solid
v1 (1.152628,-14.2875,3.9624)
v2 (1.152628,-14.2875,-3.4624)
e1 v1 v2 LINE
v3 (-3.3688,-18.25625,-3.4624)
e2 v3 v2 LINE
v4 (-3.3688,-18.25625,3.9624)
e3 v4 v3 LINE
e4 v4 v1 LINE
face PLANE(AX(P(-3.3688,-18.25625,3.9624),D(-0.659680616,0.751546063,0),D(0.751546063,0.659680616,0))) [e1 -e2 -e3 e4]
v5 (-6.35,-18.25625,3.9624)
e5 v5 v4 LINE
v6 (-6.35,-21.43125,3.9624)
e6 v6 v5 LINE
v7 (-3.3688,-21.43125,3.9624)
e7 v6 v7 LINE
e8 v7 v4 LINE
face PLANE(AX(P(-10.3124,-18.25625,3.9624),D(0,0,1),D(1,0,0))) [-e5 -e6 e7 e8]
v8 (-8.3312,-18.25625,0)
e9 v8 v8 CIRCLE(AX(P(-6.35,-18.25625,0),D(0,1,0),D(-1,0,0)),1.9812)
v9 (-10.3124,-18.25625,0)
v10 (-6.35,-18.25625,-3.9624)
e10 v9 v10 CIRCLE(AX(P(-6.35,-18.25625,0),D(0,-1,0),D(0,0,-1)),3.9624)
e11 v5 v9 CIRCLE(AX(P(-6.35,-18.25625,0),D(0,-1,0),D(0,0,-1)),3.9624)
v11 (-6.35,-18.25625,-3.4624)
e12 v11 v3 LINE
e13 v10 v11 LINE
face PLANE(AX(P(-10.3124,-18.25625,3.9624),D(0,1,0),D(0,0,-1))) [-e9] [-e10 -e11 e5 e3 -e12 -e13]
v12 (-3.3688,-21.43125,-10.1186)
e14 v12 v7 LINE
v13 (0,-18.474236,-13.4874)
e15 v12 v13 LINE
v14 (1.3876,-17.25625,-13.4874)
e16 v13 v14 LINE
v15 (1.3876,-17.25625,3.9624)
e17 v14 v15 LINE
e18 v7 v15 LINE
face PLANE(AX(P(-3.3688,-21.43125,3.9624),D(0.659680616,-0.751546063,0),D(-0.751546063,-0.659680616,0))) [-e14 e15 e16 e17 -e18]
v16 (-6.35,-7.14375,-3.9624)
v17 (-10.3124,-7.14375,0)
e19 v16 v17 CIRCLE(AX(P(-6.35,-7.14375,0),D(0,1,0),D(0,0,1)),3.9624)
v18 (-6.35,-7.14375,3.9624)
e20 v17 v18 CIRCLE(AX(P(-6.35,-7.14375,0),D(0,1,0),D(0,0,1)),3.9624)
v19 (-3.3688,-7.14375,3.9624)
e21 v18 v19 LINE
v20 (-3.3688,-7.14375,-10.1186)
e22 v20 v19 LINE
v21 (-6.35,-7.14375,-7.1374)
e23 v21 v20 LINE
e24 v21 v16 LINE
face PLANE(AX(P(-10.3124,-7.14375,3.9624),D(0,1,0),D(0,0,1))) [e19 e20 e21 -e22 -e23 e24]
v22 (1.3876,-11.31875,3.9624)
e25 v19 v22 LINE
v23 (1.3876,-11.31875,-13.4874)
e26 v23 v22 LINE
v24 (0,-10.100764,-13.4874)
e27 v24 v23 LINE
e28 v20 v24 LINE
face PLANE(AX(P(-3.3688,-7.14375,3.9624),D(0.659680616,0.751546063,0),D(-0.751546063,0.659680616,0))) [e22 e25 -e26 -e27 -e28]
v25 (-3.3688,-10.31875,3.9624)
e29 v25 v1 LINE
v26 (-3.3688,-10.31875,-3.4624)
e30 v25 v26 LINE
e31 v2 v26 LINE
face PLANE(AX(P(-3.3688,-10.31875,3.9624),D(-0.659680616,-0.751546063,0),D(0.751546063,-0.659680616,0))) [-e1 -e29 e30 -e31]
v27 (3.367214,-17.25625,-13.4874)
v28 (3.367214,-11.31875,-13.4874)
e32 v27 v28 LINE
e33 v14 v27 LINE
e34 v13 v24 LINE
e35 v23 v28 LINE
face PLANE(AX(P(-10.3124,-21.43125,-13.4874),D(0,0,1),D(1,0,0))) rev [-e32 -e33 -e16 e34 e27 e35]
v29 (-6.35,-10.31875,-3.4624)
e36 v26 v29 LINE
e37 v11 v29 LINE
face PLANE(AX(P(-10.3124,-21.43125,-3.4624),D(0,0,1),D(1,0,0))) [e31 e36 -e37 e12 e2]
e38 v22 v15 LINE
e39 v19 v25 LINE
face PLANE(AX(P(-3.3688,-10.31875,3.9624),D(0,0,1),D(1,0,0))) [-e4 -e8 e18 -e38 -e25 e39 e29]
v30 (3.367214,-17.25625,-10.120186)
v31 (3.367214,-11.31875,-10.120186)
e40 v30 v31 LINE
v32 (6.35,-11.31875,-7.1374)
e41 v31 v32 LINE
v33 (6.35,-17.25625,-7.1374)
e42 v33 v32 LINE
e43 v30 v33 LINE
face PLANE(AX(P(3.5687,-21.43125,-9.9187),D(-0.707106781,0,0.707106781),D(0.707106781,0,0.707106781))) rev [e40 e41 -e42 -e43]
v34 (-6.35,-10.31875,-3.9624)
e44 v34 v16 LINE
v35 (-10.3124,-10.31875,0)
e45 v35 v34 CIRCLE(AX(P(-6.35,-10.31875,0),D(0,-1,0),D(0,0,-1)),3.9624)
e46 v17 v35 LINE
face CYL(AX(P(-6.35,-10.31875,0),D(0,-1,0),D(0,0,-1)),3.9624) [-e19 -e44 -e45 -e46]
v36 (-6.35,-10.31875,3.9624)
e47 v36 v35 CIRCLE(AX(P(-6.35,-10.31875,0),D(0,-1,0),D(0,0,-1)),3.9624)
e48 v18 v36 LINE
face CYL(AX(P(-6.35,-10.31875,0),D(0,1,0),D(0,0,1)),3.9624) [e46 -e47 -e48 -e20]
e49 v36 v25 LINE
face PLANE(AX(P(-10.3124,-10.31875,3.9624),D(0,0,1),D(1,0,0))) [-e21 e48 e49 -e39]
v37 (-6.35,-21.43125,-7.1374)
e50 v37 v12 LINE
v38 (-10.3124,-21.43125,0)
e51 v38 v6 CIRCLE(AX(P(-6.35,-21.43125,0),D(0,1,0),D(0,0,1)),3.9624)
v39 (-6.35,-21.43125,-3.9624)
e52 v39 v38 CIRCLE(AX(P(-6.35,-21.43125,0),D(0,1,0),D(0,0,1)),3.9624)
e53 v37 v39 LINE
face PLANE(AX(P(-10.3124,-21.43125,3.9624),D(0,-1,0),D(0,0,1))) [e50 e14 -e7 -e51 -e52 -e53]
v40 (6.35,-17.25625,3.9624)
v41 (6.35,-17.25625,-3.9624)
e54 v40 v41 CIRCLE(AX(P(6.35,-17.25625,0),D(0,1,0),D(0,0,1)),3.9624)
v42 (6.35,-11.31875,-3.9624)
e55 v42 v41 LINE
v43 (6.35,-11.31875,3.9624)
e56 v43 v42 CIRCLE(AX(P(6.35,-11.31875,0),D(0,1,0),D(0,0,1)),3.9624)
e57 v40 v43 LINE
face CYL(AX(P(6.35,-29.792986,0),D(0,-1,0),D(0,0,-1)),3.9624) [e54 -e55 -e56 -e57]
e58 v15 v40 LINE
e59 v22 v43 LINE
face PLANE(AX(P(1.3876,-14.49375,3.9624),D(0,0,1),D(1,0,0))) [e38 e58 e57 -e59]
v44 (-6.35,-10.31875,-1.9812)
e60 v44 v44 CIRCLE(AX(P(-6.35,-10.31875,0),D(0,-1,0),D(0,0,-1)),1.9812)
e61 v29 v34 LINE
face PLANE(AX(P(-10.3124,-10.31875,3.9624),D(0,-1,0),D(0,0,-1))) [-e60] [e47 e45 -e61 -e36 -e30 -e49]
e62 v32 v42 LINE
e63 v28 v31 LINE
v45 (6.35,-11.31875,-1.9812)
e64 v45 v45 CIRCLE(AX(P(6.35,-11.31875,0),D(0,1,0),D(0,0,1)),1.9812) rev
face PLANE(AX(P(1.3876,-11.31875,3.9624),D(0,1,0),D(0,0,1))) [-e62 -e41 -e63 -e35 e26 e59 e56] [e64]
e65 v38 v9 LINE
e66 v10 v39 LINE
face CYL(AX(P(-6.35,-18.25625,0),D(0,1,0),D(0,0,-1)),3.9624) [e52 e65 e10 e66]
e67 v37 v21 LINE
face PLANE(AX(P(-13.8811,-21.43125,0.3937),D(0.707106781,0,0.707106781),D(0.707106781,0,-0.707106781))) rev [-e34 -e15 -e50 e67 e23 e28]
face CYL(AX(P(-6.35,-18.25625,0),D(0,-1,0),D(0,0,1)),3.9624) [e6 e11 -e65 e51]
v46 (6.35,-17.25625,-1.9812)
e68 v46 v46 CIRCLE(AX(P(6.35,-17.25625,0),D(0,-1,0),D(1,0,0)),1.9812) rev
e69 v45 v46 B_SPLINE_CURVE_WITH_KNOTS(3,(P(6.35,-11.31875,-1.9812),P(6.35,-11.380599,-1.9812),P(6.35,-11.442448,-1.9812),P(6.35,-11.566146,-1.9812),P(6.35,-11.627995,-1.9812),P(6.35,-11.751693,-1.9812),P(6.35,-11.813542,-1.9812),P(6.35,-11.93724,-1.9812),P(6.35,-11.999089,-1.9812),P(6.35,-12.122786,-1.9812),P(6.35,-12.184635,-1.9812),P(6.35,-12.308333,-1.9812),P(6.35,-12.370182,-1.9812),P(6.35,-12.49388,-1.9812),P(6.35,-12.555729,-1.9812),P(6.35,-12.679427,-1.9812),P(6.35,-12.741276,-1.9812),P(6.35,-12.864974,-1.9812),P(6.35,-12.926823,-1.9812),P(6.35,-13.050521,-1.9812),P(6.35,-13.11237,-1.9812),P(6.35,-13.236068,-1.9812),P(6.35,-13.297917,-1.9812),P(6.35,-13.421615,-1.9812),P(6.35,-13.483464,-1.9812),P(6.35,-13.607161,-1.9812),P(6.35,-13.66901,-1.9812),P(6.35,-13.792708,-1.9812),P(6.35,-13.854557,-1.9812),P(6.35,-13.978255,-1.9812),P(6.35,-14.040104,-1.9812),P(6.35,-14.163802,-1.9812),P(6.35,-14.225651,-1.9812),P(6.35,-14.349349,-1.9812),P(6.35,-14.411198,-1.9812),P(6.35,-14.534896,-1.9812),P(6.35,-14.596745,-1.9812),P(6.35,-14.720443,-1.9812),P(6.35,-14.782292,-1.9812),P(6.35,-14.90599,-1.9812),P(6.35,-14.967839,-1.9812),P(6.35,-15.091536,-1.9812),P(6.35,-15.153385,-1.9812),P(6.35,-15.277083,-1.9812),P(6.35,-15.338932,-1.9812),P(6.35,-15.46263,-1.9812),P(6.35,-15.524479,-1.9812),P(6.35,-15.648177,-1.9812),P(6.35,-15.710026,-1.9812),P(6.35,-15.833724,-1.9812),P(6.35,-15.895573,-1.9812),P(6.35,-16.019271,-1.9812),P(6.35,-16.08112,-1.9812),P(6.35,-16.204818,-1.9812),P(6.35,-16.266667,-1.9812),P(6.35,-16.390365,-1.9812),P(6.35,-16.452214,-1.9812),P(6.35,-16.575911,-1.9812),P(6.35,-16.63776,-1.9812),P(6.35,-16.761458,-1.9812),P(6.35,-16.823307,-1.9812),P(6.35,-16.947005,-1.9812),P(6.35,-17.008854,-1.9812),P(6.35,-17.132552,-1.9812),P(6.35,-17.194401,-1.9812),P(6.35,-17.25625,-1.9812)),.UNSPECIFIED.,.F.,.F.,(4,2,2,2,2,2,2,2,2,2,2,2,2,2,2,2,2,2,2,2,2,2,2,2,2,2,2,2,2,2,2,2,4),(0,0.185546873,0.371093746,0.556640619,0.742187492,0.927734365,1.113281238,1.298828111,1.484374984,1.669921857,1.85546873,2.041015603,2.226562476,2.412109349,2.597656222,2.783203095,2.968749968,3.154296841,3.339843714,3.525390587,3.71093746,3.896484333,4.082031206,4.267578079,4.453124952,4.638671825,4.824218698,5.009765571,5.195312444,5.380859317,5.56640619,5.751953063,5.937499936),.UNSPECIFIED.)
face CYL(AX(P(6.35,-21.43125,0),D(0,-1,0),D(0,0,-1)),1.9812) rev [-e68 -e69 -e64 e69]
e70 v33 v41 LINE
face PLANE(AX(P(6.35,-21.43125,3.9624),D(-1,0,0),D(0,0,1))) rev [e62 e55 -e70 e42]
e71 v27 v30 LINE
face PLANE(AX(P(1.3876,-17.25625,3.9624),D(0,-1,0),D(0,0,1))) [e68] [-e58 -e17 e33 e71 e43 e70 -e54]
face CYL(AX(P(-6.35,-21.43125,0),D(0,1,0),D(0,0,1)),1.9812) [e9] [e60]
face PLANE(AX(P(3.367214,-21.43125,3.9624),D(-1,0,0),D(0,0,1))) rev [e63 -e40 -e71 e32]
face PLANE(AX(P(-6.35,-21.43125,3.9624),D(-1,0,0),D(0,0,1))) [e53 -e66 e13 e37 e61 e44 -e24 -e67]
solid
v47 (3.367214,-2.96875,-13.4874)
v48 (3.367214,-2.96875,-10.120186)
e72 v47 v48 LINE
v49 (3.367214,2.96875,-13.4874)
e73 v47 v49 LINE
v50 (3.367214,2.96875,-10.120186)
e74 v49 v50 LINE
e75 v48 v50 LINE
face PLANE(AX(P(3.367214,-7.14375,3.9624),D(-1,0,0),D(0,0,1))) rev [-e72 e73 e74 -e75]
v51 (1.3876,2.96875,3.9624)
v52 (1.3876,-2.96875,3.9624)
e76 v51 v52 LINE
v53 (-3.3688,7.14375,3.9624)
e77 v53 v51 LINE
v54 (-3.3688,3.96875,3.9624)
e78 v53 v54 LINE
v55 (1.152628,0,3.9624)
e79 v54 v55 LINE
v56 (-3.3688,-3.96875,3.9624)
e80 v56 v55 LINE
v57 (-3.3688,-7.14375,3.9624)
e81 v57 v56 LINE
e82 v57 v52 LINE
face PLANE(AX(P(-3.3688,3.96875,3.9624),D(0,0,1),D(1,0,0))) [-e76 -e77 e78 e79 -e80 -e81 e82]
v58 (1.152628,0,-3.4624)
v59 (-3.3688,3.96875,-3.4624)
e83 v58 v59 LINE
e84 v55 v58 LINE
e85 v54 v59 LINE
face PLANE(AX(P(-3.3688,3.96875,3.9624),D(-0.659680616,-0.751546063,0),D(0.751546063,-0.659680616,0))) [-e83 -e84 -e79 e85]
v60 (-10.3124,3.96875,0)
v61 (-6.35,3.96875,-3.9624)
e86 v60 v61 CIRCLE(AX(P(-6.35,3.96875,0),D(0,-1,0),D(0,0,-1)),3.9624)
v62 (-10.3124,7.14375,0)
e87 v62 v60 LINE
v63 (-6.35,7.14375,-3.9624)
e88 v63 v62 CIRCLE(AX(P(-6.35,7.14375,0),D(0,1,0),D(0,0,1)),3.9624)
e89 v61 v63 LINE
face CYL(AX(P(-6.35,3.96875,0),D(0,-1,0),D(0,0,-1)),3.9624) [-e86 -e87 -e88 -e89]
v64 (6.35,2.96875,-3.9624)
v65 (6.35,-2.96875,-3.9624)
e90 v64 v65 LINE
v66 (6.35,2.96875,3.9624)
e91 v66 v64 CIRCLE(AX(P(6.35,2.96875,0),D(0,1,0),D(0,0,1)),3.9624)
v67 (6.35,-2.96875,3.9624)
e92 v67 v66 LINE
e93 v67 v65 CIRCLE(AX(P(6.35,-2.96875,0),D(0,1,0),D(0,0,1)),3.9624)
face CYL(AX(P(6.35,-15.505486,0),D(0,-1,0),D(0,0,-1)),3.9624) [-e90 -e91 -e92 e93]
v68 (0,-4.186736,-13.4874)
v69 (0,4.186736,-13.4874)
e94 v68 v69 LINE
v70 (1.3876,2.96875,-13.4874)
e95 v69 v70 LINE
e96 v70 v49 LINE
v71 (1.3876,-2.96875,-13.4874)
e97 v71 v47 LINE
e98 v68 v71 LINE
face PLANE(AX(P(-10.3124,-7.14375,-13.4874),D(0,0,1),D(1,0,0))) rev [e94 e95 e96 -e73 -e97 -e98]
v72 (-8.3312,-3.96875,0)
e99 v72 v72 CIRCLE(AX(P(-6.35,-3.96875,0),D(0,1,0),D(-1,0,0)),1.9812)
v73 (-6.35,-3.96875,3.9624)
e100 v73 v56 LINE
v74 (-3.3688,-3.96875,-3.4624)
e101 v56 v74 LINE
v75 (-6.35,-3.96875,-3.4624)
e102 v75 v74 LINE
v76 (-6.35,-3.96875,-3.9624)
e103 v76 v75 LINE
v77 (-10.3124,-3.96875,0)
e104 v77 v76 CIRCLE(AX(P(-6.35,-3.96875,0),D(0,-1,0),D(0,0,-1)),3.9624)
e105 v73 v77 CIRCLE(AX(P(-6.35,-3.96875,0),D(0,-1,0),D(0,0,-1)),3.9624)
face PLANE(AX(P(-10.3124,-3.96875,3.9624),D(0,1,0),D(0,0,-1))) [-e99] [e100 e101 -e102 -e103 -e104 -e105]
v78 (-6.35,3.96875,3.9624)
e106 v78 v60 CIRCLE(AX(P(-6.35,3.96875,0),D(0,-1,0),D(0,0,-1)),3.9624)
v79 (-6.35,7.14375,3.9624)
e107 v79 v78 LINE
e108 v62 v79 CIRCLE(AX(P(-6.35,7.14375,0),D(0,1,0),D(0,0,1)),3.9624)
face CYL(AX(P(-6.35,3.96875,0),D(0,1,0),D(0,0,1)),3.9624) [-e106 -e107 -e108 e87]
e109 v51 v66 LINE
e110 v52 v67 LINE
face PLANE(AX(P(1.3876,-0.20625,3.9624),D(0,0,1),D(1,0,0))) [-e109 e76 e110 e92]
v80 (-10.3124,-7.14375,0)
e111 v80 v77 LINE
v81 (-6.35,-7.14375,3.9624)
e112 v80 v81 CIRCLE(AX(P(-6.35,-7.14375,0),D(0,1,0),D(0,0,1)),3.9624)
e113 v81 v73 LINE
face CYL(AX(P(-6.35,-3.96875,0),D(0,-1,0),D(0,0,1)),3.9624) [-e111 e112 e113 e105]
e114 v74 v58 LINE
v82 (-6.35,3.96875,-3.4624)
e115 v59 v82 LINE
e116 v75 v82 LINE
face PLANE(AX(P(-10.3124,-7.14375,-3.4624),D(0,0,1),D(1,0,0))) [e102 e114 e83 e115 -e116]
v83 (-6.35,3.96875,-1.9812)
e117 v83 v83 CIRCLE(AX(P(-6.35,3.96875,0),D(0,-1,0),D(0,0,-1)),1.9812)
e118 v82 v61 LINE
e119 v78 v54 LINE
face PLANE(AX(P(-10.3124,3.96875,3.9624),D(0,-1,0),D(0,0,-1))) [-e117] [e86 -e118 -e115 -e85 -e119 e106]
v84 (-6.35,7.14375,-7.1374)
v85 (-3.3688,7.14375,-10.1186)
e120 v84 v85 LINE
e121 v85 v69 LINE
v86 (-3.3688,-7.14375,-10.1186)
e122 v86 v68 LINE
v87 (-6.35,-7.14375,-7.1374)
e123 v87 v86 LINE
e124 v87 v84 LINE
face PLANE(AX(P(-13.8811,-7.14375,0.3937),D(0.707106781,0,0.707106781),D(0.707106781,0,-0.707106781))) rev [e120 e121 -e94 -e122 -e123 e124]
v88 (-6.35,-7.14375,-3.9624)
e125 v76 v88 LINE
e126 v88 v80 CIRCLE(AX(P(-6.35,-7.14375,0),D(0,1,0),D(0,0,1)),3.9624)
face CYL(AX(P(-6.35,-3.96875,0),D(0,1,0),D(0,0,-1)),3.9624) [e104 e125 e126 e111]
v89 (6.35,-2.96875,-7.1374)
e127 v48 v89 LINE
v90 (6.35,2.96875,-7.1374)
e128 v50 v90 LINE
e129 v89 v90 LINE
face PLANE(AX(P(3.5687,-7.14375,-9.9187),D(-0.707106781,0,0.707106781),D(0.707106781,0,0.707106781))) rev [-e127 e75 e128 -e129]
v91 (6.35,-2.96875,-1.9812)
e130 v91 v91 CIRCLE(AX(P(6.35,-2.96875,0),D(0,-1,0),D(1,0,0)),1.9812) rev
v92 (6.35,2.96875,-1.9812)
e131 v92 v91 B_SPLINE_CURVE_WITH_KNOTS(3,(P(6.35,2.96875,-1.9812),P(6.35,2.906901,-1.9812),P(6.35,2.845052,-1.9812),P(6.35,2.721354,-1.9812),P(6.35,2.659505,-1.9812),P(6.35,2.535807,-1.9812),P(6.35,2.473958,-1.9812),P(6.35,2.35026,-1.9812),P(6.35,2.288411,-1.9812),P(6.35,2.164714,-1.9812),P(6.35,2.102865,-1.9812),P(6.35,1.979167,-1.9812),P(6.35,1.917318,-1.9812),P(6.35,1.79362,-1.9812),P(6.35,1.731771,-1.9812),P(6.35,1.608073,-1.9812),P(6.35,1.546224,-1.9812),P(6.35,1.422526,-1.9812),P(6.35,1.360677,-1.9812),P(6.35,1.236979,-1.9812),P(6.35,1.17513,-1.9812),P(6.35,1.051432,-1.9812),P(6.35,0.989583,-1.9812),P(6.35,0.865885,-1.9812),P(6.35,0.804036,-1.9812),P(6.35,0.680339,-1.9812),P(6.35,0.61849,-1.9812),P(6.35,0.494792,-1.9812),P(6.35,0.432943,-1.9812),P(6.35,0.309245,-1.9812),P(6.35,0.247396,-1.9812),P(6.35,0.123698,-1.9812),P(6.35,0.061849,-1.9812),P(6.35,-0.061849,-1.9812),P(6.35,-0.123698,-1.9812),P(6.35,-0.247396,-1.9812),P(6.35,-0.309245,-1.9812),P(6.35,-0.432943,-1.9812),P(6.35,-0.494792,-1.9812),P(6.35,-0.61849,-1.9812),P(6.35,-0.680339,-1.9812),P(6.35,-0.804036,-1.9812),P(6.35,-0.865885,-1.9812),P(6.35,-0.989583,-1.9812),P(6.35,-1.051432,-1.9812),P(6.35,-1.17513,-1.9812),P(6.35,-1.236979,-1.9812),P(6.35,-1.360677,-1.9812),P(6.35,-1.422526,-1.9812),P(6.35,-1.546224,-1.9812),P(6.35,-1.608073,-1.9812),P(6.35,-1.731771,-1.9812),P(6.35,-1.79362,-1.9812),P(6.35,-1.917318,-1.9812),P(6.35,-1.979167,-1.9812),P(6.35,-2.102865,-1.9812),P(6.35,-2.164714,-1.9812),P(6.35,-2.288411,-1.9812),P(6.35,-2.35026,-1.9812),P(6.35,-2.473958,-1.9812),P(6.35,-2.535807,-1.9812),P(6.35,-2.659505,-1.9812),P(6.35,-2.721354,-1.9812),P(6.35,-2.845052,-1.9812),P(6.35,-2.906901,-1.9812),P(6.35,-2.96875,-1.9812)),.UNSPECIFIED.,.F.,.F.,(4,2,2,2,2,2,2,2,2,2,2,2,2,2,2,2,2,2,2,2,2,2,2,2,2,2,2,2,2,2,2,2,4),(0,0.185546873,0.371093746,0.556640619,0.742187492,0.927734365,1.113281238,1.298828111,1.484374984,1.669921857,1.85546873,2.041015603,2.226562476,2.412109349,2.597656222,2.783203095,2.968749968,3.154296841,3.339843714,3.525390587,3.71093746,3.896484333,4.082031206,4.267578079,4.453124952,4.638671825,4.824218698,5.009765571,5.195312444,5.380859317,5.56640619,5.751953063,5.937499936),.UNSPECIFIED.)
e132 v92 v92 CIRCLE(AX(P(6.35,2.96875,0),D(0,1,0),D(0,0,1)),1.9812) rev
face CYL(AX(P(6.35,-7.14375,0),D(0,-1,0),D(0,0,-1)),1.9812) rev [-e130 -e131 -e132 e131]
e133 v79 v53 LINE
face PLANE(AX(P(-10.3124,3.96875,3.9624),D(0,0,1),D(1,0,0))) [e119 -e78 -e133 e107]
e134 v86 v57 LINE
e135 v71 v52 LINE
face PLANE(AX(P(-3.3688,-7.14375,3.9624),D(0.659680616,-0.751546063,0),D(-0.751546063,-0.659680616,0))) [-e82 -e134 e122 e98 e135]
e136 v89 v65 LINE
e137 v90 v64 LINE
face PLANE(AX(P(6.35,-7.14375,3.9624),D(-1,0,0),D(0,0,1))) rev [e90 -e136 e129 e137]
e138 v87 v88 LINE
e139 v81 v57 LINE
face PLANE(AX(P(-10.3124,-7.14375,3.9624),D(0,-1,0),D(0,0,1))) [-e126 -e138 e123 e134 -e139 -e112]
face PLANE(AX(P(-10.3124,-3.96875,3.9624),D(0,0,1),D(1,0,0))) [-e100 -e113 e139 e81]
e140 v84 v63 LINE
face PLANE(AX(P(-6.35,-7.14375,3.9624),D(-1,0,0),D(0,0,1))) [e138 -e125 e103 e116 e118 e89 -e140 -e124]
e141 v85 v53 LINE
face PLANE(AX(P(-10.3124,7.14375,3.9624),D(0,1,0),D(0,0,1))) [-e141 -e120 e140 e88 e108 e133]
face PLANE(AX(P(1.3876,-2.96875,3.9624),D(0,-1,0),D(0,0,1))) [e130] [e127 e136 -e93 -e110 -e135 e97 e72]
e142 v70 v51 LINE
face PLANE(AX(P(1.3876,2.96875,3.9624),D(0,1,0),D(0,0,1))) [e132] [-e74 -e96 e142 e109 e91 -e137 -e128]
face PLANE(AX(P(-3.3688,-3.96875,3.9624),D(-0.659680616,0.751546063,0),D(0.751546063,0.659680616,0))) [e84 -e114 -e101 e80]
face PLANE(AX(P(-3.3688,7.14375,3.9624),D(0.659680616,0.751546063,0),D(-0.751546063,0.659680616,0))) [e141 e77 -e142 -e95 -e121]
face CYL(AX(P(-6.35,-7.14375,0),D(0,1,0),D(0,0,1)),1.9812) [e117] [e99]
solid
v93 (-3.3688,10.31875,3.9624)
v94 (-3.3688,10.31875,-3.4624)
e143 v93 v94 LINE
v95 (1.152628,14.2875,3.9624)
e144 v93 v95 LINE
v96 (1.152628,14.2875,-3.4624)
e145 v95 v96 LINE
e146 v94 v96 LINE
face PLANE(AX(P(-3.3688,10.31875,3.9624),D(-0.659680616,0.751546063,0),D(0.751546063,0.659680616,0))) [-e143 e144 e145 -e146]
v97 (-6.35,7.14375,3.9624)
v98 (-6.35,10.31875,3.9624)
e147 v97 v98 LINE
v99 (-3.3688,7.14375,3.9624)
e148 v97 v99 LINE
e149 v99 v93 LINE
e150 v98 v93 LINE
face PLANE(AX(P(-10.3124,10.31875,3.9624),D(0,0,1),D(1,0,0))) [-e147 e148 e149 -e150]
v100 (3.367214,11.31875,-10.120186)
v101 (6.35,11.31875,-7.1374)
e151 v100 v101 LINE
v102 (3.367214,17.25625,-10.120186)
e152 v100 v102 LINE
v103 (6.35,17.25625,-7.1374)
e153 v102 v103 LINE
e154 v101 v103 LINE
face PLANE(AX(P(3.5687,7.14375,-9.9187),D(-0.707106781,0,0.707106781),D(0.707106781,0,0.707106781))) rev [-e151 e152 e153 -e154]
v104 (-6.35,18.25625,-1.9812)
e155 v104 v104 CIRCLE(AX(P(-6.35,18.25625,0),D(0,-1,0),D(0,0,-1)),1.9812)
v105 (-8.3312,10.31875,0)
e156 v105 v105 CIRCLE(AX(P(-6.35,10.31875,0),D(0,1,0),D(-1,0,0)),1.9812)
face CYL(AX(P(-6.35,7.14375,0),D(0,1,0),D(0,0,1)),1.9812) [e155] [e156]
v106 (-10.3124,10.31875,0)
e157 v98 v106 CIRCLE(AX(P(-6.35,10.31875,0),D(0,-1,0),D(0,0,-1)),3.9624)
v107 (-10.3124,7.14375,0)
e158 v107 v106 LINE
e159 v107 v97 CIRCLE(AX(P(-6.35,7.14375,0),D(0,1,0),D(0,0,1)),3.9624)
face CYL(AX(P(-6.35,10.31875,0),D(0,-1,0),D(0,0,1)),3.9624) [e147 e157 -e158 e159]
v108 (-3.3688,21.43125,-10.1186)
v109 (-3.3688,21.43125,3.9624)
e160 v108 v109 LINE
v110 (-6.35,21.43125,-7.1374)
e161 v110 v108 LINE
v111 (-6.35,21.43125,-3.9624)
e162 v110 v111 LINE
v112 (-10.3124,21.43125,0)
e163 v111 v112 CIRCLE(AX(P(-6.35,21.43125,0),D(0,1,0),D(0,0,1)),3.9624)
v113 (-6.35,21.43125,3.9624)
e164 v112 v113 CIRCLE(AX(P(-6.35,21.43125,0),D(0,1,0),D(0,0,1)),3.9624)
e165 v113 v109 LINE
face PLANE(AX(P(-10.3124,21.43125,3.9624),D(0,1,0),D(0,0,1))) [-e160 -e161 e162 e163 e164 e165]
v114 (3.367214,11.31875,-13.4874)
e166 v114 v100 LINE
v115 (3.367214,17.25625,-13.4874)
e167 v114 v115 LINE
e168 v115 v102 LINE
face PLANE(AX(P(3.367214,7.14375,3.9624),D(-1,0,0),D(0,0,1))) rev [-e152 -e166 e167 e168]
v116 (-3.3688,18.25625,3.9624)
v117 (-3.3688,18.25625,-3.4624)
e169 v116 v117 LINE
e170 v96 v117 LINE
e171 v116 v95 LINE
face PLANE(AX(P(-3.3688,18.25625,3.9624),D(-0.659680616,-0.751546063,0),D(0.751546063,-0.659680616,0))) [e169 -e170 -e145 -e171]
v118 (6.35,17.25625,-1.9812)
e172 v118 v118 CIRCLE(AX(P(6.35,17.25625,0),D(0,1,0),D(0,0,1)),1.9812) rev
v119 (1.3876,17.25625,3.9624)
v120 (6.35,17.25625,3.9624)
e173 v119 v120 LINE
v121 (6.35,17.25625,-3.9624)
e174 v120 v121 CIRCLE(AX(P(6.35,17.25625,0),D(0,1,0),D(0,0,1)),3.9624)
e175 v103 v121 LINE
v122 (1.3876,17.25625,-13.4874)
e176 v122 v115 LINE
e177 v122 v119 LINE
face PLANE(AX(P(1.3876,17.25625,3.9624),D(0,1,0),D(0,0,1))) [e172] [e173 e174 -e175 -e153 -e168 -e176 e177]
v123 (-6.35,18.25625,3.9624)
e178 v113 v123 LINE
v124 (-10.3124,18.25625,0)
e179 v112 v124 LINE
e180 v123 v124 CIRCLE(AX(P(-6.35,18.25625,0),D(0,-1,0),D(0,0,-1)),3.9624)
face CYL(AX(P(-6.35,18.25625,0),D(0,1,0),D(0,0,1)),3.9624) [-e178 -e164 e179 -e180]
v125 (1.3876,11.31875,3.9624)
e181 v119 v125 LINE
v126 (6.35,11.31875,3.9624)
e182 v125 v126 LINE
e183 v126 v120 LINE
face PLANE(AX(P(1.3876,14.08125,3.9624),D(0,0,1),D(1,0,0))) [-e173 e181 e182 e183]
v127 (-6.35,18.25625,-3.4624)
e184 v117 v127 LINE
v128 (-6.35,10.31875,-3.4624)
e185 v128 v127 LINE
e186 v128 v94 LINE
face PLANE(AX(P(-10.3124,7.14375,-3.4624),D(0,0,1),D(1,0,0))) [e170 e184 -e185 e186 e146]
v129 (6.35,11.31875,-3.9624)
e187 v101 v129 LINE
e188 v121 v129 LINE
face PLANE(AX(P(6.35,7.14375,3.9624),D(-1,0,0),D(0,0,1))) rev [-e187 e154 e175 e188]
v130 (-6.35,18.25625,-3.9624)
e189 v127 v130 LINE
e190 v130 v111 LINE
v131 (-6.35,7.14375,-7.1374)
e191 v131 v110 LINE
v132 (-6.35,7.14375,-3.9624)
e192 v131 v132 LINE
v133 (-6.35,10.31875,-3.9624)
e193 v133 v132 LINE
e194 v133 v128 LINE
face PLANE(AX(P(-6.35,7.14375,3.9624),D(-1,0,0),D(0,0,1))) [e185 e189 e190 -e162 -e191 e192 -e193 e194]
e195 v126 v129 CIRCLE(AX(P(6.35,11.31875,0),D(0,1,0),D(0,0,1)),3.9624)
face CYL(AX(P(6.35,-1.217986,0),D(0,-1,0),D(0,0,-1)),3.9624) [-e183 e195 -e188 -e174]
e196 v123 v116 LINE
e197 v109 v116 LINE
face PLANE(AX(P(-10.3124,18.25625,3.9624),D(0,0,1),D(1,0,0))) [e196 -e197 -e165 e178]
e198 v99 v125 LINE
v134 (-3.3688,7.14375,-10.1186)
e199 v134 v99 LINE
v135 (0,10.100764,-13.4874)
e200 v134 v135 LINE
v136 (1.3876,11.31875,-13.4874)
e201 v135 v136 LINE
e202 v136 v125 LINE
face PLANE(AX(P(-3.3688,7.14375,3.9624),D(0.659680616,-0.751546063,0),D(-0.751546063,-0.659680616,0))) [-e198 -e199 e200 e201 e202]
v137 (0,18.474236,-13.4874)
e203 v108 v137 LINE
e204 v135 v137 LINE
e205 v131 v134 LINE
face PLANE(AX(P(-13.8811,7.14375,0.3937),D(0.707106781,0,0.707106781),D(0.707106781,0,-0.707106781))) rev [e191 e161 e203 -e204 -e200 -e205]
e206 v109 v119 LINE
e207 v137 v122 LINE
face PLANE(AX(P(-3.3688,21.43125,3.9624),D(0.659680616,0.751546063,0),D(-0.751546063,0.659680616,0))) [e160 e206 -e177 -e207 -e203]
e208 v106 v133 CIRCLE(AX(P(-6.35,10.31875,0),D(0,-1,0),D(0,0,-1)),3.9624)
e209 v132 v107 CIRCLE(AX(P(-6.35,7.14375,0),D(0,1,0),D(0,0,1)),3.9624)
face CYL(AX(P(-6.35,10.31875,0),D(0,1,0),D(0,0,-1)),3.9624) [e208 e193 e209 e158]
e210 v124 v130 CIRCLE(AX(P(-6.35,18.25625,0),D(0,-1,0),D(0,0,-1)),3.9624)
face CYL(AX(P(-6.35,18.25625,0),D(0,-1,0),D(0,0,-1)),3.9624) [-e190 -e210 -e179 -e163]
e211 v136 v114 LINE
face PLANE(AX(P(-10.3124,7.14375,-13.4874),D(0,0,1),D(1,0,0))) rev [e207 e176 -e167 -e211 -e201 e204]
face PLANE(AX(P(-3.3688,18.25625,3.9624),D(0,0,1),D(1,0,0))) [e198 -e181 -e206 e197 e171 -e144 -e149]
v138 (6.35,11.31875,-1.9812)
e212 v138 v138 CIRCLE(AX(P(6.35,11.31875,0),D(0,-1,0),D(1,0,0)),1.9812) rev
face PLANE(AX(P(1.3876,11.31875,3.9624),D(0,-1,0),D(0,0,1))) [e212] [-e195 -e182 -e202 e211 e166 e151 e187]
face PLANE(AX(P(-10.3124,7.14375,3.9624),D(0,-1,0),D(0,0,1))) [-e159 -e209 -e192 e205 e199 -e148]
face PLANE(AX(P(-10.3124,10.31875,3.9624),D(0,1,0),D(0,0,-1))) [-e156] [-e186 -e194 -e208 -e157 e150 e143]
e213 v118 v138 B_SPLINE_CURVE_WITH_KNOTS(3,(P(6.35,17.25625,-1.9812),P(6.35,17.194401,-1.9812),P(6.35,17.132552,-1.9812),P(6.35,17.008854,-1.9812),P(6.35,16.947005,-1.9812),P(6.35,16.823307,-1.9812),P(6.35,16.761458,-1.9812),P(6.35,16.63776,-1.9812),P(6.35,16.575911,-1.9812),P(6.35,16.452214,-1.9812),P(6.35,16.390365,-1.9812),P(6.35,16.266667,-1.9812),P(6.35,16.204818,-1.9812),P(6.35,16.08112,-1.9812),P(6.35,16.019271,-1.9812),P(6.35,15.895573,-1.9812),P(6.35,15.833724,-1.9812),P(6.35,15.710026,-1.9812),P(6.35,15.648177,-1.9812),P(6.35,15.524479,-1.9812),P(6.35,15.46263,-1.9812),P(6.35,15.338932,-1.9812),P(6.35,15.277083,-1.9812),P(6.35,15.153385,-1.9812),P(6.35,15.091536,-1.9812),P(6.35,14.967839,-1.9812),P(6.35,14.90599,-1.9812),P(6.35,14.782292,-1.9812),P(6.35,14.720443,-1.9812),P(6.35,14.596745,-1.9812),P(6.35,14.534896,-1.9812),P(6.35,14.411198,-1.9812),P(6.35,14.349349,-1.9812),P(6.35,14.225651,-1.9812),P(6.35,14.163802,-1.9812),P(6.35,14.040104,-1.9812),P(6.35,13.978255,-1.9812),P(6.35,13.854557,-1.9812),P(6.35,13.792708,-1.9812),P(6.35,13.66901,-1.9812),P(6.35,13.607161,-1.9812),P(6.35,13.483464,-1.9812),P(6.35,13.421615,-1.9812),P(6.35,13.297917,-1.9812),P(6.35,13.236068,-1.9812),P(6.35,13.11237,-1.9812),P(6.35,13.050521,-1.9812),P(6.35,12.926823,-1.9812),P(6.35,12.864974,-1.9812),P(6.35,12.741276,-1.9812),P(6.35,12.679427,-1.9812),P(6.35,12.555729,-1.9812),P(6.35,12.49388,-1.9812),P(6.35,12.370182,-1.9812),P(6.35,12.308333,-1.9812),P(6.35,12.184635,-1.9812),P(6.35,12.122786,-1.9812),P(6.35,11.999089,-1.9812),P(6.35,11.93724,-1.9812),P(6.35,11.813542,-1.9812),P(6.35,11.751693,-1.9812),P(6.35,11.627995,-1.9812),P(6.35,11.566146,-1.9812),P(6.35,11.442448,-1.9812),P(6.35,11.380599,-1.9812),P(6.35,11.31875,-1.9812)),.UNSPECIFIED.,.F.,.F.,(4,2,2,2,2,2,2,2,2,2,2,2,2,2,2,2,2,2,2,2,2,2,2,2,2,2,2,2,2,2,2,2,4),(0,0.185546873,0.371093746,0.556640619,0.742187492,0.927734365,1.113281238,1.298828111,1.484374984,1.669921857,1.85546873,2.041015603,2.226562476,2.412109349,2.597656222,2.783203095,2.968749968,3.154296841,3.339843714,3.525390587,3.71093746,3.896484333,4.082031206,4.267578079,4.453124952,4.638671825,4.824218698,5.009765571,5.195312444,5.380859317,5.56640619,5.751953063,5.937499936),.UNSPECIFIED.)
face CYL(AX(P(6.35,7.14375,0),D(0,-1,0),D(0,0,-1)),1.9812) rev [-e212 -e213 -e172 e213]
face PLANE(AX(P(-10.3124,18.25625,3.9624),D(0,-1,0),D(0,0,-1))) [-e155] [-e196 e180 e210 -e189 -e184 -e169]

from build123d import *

# Parameters (mm, degrees)
SWEEP1_START            = -3.9624
SWEEP1_DEPTH            = 7.9248
FILLET1_R               = 3.9624
BOSS_EXTRUDE3_START     = 17.25625
SKETCH1_11_R            = 3.9624
BOSS_EXTRUDE3_DEPTH     = 5.937499936
CUT_EXTRUDE4_DEPTH      = 25.111090479
CUT_EXTRUDE4_DEPTH_BACK = 25.111090479
SKETCH1_7_R             = 1.9812
BOSS_EXTRUDE1_START     = 21.43125
SKETCH1_R               = 1.9812
BOSS_EXTRUDE1_DEPTH     = 14.2875
BOSS_EXTRUDE5_START     = 21.43125
SKETCH5_W               = 12.7
SKETCH5_H               = 0.500000016
SKETCH5_H_2             = 3.175
BOSS_EXTRUDE5_DEPTH     = 14.2875
CUT_EXTRUDE5_DEPTH      = 28.341434291
LPATTERN4_COUNT         = 3
LPATTERN4_PITCH         = 14.2875


# Read off the part's stored shape, not the designer's step: Sweep1
with BuildPart() as part:
    # Sweep1 outline → Sweep1 (new body)
    with BuildSketch(Plane.XY.offset(SWEEP1_START)):
        Polygon((1.387599968, 14.081249968), (10.3124, 14.081249968), (10.3124, 17.256249968), (1.387599968, 17.256249968), (-3.368799968, 21.43125), (-10.3124, 21.43125), (-10.3124, 18.25625), (-3.368799968, 18.25625), align=None)
    extrude(amount=SWEEP1_DEPTH)

    # Fillet1
    fillet1_edges = [part.edges().sort_by_distance(p)[0] for p in [
        (-10.3124, 19.84375, 3.9624),
        (-10.3124, 19.84375, -3.9624),
        (10.3124, 15.668749968, -3.9624),
        (10.3124, 15.668749968, 3.9624),
    ]]
    fillet(fillet1_edges, radius=FILLET1_R - 0.0001)  # a hair under: the kernel refuses the full size

    # Mirror3: part across plane


with BuildPart() as part_1:
    add(part.part)
    add(part.part.mirror(Plane.ZX.offset(14.2875)))

    # Sketch1<11> → Boss-Extrude3 (add)
    with BuildSketch(Plane(origin=(0, 0, 0), x_dir=(-1, 0, 0), z_dir=(0, 1, 0)).offset(BOSS_EXTRUDE3_START)):
        with Locations((-6.35, 0)):
            Circle(SKETCH1_11_R)
    extrude(amount=-BOSS_EXTRUDE3_DEPTH)

    # Sketch1<7> → Cut-Extrude4 (cut, two sides: drawn at the far end of the back side and taken through both)
    with BuildSketch(Plane(origin=(0, 0, 0), x_dir=(-1, 0, 0), z_dir=(0, 1, 0)).offset(-CUT_EXTRUDE4_DEPTH_BACK)):
        with Locations(Location((-6.35, 0, 0), (0, 0, 270))):
            Circle(SKETCH1_7_R)
    extrude(amount=CUT_EXTRUDE4_DEPTH + CUT_EXTRUDE4_DEPTH_BACK, mode=Mode.SUBTRACT)

    # Sketch1 → Boss-Extrude1 (add)
    with BuildSketch(Plane(origin=(0, 0, 0), x_dir=(-1, 0, 0), z_dir=(0, 1, 0)).offset(BOSS_EXTRUDE1_START)):
        with Locations((6.35, 0)):
            Circle(SKETCH1_R)
    extrude(amount=-BOSS_EXTRUDE1_DEPTH)

    # Sketch5 → Boss-Extrude5 (add)
    with BuildSketch(Plane(origin=(0, 0, 0), x_dir=(-1, 0, 0), z_dir=(0, 1, 0)).offset(BOSS_EXTRUDE5_START)):
        with Locations((0, -3.712399992)):
            Rectangle(SKETCH5_W, SKETCH5_H)
        with Locations((0, -5.5499)):
            Rectangle(SKETCH5_W, SKETCH5_H_2)
        Polygon((6.35, -7.1374), (-6.35, -7.1374), (-3.367213597, -10.120186403), (-3.367213597, -13.4874), (0, -13.4874), align=None)
    extrude(amount=-BOSS_EXTRUDE5_DEPTH)

    # Sketch2<5> → Cut-Extrude5 (cut, symmetric)
    with BuildSketch(Plane(origin=(0, 0, 0), x_dir=(0, 1, 0), z_dir=(0, 0, 1))):
        Polygon((21.43125, 70.492676256), (21.43125, 10.3124), (21.43125, 3.368799968), (17.256249968, -1.387599968), (17.256249968, -10.3124), (17.256249968, -70.492676256), (137.564063269, -74.055352204), (141.739063301, 66.930000309), align=None)
    cut_extrude5 = extrude(amount=CUT_EXTRUDE5_DEPTH, both=True, mode=Mode.SUBTRACT)

    # Mirror7: Cut-Extrude5 across plane
    add(cut_extrude5.mirror(Plane.ZX.offset(14.2875)), mode=Mode.SUBTRACT)


with BuildPart() as lpattern4_1:
    # LPattern4: pattern copy
    add(part_1.part.moved(Location(Vector(0, -1, 0) * (1 * LPATTERN4_PITCH))))


with BuildPart() as lpattern4_2:
    # LPattern4: pattern copy
    add(part_1.part.moved(Location(Vector(0, -1, 0) * (2 * LPATTERN4_PITCH))))


solid = Compound([part_1.part, lpattern4_1.part, lpattern4_2.part])
